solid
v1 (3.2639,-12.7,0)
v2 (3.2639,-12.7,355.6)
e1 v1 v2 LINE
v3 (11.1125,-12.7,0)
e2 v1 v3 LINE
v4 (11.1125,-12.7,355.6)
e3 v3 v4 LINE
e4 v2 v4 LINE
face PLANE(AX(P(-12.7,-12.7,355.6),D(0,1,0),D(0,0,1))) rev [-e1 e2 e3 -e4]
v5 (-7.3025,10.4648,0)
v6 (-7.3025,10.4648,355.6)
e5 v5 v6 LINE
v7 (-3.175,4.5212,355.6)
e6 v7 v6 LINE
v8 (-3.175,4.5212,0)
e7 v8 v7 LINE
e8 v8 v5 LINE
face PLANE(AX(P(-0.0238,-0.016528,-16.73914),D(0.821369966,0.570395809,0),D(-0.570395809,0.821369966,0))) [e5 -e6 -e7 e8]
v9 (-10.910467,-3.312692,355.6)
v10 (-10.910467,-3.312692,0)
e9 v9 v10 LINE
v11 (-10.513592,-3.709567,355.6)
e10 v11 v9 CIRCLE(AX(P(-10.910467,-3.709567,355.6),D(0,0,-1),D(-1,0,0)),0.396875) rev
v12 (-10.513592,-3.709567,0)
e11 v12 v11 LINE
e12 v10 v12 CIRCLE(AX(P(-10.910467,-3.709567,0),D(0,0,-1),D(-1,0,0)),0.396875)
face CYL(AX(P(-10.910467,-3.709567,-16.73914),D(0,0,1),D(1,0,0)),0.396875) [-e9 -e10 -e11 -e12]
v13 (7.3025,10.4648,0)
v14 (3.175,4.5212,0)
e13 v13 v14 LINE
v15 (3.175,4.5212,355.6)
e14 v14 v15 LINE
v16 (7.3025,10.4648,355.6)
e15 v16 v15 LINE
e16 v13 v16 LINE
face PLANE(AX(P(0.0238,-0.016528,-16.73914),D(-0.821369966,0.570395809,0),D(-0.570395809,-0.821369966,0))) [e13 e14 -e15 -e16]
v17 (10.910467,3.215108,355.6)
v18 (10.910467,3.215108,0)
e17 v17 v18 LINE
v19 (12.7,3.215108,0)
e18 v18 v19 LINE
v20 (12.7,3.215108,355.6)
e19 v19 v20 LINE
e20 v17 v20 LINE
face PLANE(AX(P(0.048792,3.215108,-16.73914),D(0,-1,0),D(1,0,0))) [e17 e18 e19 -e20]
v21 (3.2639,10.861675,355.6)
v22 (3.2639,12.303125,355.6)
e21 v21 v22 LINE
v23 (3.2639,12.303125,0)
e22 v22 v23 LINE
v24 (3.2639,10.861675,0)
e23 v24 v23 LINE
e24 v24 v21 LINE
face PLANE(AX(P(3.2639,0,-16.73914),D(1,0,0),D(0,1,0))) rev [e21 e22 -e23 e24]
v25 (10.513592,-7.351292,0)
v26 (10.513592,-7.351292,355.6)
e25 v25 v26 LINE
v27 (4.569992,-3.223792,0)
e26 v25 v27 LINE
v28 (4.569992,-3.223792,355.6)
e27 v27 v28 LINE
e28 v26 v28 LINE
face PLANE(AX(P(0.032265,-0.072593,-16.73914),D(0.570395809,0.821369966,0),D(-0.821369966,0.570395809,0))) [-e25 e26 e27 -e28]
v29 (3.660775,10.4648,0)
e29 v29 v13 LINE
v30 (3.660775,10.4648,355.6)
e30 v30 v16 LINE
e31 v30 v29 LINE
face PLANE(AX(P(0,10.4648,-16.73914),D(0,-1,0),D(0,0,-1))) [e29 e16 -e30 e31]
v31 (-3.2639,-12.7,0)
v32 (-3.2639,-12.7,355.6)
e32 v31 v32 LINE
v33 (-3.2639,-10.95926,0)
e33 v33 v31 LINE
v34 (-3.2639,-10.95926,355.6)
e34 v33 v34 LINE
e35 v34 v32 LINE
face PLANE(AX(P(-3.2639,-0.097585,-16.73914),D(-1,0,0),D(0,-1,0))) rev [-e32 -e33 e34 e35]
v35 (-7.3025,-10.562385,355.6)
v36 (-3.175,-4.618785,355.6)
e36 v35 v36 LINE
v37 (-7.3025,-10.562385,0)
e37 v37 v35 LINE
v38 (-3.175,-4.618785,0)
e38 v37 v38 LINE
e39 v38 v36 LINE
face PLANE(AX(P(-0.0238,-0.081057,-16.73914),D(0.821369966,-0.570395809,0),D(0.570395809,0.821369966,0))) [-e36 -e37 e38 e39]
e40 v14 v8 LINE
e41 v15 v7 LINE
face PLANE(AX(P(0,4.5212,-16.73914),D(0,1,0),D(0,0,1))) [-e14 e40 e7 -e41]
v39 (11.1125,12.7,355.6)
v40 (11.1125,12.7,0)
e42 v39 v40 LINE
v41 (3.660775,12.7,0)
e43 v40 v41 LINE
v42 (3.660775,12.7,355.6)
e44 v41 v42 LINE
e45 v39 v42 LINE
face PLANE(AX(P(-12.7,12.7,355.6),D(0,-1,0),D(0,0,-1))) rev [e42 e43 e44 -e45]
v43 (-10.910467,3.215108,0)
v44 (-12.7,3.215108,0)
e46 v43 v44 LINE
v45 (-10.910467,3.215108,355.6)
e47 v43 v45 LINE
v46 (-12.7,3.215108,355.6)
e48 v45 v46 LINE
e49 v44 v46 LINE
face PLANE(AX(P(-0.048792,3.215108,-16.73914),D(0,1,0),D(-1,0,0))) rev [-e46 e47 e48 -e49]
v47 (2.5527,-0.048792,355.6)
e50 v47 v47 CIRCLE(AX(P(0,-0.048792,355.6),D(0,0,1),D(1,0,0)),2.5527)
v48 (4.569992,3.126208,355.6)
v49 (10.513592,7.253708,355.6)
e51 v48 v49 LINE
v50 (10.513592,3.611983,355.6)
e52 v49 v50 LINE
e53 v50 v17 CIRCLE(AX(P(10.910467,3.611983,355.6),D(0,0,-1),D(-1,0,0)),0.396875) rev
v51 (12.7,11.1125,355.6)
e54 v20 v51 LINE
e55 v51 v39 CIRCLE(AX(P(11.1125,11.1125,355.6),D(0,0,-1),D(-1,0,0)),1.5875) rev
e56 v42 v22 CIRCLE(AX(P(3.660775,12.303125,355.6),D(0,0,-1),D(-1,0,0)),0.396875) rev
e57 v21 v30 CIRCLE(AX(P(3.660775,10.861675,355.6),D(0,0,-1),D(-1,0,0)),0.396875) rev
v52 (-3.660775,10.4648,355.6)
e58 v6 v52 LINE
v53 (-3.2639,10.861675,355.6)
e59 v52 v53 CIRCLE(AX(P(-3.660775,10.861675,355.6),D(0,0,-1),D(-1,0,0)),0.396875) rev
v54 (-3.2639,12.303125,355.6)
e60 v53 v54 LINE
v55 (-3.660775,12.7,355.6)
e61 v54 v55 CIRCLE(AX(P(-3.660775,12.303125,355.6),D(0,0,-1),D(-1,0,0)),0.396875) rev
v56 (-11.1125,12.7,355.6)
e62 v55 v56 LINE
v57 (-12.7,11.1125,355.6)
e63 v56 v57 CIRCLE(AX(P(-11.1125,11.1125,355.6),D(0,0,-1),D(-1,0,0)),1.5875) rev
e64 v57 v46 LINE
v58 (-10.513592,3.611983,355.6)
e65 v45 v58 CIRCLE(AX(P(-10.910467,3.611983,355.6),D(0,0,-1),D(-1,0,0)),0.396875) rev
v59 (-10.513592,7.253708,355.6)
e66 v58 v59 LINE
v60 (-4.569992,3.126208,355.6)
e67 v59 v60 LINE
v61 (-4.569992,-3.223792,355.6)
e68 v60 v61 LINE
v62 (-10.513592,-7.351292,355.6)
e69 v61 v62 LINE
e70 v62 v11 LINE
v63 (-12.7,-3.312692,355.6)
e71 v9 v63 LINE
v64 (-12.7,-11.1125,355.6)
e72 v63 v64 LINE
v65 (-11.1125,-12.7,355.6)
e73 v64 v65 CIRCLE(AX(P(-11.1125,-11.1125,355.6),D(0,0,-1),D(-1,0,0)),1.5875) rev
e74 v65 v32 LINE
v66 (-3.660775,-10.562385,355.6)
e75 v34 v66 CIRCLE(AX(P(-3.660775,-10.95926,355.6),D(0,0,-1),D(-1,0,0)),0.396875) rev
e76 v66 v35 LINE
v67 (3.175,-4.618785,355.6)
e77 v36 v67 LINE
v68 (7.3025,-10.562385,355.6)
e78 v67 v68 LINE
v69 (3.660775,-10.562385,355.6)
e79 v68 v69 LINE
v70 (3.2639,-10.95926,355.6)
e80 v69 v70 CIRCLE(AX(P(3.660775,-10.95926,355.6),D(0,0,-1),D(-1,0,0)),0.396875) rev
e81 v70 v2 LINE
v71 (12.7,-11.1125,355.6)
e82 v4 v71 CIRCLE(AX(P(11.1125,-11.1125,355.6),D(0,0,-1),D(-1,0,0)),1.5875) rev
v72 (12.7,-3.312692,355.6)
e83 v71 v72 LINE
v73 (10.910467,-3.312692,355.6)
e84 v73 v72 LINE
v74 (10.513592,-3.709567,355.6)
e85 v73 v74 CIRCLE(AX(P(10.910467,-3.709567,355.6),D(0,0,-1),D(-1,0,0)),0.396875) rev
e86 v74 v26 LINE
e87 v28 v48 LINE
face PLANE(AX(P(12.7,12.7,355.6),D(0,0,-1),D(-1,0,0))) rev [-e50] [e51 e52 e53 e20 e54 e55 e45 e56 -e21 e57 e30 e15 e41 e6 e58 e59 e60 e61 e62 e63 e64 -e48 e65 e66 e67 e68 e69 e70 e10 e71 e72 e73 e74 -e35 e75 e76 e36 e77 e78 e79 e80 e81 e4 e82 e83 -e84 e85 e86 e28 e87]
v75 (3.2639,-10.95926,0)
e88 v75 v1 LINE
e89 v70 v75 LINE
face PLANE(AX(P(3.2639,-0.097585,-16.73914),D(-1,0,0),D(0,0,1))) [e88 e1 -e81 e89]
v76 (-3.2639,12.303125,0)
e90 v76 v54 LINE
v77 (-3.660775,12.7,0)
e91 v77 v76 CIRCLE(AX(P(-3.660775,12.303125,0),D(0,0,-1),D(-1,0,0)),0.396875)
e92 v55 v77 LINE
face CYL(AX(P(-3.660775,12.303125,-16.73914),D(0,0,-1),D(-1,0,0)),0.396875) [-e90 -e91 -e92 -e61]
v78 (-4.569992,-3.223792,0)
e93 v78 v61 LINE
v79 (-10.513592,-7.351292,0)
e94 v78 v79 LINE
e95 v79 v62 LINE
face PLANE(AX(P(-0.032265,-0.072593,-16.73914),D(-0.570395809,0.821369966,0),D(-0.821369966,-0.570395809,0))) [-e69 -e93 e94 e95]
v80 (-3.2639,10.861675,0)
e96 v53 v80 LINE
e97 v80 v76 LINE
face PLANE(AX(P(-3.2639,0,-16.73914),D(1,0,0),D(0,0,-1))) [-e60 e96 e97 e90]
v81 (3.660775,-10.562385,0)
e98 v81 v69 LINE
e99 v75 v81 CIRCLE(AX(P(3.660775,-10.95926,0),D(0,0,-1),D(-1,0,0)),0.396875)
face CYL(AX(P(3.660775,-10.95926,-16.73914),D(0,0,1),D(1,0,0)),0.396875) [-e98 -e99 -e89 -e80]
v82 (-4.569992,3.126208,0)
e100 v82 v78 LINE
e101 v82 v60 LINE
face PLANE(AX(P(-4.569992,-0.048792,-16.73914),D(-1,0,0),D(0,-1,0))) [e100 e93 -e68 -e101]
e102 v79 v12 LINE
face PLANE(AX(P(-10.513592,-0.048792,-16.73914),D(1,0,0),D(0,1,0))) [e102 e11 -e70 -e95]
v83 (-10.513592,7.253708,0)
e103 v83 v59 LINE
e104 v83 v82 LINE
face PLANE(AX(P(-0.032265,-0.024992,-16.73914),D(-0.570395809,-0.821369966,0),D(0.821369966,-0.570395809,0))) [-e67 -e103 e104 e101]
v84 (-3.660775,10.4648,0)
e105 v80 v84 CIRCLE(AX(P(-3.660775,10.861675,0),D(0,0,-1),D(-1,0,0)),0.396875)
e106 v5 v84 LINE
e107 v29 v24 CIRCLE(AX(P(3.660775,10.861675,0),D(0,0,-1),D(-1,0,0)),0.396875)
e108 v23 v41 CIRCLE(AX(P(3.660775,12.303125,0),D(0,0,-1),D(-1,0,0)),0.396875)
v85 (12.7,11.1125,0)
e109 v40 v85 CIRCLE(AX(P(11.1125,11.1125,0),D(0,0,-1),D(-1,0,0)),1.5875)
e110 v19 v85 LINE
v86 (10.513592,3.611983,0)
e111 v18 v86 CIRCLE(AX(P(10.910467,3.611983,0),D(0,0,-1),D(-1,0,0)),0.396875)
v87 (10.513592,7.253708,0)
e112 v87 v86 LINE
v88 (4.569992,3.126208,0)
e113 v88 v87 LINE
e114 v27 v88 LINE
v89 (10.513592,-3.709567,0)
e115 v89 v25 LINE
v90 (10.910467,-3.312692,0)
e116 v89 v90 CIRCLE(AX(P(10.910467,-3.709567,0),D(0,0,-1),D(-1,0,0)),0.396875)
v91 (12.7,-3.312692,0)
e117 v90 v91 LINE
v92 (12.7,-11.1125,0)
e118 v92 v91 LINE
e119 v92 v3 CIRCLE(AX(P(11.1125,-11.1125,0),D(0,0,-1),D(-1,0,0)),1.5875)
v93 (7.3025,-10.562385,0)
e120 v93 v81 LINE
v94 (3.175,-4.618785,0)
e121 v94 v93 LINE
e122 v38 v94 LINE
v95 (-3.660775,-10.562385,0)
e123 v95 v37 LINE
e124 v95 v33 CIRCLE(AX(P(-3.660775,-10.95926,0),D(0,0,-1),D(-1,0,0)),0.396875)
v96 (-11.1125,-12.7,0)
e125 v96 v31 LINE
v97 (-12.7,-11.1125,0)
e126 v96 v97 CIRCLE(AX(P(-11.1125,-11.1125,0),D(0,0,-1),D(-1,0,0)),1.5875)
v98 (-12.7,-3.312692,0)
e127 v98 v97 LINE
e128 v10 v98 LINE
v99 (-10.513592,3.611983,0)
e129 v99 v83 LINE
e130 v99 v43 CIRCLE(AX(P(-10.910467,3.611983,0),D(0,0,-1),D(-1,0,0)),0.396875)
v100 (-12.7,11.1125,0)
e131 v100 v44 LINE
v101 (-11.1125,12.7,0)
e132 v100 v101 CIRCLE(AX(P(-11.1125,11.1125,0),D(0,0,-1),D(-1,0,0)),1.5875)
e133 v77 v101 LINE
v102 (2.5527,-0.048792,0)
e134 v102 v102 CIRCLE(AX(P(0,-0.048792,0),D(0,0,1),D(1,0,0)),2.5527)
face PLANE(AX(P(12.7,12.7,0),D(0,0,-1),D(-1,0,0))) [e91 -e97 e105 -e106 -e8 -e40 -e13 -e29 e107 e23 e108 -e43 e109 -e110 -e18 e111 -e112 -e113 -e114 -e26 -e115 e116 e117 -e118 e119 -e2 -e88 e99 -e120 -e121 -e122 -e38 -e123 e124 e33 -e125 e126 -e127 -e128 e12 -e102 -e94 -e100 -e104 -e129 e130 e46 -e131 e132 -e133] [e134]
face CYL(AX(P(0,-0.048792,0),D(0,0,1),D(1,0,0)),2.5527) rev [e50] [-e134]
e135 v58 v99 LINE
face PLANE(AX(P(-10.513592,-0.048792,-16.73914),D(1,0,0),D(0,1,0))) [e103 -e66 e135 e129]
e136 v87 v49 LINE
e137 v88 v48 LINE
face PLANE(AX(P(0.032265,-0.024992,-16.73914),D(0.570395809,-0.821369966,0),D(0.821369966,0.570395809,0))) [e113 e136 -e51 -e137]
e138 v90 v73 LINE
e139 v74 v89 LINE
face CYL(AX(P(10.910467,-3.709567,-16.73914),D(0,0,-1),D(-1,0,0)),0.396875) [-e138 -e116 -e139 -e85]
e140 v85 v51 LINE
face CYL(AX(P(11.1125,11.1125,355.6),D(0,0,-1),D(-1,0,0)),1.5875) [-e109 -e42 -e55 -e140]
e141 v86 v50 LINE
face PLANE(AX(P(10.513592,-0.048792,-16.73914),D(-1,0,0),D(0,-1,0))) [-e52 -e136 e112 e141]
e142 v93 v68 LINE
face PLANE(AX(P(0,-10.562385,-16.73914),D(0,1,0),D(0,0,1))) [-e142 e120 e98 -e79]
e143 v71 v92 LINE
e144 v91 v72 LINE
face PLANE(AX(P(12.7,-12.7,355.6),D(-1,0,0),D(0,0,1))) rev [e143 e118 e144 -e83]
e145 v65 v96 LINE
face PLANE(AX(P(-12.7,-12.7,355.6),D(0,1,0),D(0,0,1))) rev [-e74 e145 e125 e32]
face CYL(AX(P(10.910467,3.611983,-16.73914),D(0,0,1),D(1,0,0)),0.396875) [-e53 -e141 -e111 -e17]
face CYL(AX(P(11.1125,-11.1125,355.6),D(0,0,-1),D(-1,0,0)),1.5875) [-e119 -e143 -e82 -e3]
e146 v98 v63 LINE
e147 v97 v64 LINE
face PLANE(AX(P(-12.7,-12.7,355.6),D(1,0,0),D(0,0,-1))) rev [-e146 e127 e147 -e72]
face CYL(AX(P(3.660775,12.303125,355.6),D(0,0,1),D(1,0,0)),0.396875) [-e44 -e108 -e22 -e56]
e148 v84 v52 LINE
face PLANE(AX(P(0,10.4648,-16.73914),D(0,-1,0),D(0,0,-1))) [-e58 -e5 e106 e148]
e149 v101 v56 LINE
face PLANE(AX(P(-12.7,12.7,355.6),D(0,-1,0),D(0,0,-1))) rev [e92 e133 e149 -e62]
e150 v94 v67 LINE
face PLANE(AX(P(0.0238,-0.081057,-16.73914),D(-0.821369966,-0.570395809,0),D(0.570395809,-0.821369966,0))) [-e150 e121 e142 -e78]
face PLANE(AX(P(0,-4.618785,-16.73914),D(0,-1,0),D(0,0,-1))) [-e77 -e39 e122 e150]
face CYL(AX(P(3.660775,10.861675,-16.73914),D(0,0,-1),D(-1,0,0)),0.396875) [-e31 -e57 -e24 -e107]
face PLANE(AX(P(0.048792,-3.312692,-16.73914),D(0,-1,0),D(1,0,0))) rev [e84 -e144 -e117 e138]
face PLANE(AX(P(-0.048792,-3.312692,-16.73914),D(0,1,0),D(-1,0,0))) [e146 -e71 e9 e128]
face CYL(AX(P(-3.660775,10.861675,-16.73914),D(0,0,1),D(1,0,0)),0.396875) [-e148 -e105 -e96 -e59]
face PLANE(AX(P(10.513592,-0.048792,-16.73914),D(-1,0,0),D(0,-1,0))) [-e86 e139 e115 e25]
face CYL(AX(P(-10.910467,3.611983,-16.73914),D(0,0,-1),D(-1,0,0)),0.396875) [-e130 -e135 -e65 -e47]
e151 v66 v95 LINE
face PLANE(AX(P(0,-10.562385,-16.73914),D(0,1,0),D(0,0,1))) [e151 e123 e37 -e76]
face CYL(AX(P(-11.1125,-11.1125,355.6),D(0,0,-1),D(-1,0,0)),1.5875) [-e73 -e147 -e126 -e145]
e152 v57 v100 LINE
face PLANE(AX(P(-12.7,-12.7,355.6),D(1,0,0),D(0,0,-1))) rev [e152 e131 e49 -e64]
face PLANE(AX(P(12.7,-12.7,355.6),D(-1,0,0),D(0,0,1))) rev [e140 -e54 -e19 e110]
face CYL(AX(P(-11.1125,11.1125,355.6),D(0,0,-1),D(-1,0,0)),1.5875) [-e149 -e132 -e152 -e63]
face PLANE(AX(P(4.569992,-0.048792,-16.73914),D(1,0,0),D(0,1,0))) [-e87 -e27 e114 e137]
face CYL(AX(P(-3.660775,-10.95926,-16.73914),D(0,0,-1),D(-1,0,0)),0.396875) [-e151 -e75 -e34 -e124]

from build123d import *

# Parameters (mm, degrees)
SKETCH1_W           = 25.4
SKETCH1_H           = 25.4
BOSS_EXTRUDE1_DEPTH = 355.6
FILLET1_R           = 1.5875
HOLE1_OUTLINE_R     = 2.5527
HOLE1_DEPTH         = 355.6
SKETCH7_W           = 6.5278
SKETCH7_H           = 2.2352
CUT_EXTRUDE2_DEPTH  = 355.6
FILLET4_R           = 0.396875
CIRPATTERN2_DEPTH   = 355.6


# Read off the part's stored shape, not the designer's step: Hole1, CirPattern2
with BuildPart() as part:
    # Sketch1 → Boss-Extrude1 (new body)
    with BuildSketch(Plane.XY):
        Rectangle(SKETCH1_W, SKETCH1_H)
    extrude(amount=BOSS_EXTRUDE1_DEPTH)

    # Fillet1
    fillet1_edges = [part.edges().sort_by_distance(p)[0] for p in [
        (12.7, -12.7, 177.8),
        (-12.7, -12.7, 177.8),
        (-12.7, 12.7, 177.8),
        (12.7, 12.7, 177.8),
    ]]
    fillet(fillet1_edges, radius=FILLET1_R)

    # Hole1 outline → Hole1 (cut)
    with BuildSketch(Plane.XY):
        with Locations((0, -0.048792482)):
            Circle(HOLE1_OUTLINE_R)
    extrude(amount=HOLE1_DEPTH, mode=Mode.SUBTRACT)

    # Sketch7 → Cut-Extrude2 (cut)
    with BuildSketch(Plane.XY.offset(355.6)):
        with Locations((0, 11.5824)):
            Rectangle(SKETCH7_W, SKETCH7_H)
        Polygon((-3.175, 4.5212), (-7.3025, 10.4648), (7.3025, 10.4648), (3.175, 4.5212), align=None)
    extrude(amount=-CUT_EXTRUDE2_DEPTH, mode=Mode.SUBTRACT)

    # Fillet4
    fillet4_edges = [part.edges().sort_by_distance(p)[0] for p in [
        (-3.2639, 10.4648, 177.8),
        (-3.2639, 12.7, 177.8),
        (3.2639, 12.7, 177.8),
        (3.2639, 10.4648, 177.8),
    ]]
    fillet(fillet4_edges, radius=FILLET4_R)

    # CirPattern2 outline → CirPattern2 (cut)
    with BuildSketch(Plane.XY):
        with BuildLine():
            ThreePointArc((-3.660775, -10.562384964), (-3.380141996, -10.67862696), (-3.2639, -10.959259964))
            Line((-3.2639, -10.959259964), (-3.2639, -12.7))
            Line((-3.2639, -12.7), (3.2639, -12.7))
            Line((3.2639, -12.7), (3.2639, -10.959259964))
            ThreePointArc((3.2639, -10.959259964), (3.380141996, -10.67862696), (3.660775, -10.562384964))
            Line((3.660775, -10.562384964), (7.3025, -10.562384964))
            Line((7.3025, -10.562384964), (3.175, -4.618784964))
            Line((3.175, -4.618784964), (-3.175, -4.618784964))
            Line((-3.175, -4.618784964), (-7.3025, -10.562384964))
            Line((-7.3025, -10.562384964), (-3.660775, -10.562384964))
        make_face()
        with BuildLine():
            Line((-12.7, -3.312692482), (-10.910467482, -3.312692482))
            ThreePointArc((-10.910467482, -3.312692482), (-10.629834478, -3.428934478), (-10.513592482, -3.709567482))
            Line((-10.513592482, -3.709567482), (-10.513592482, -7.351292482))
            Line((-10.513592482, -7.351292482), (-4.569992482, -3.223792482))
            Line((-4.569992482, -3.223792482), (-4.569992482, 3.126207518))
            Line((-4.569992482, 3.126207518), (-10.513592482, 7.253707518))
            Line((-10.513592482, 7.253707518), (-10.513592482, 3.611982518))
            ThreePointArc((-10.513592482, 3.611982518), (-10.629834478, 3.331349514), (-10.910467482, 3.215107518))
            Line((-10.910467482, 3.215107518), (-12.7, 3.215107518))
            Line((-12.7, 3.215107518), (-12.7, -3.312692482))
        make_face()
        with BuildLine():
            ThreePointArc((10.513592482, -3.709567482), (10.629834478, -3.428934478), (10.910467482, -3.312692482))
            Line((10.910467482, -3.312692482), (12.7, -3.312692482))
            Line((12.7, -3.312692482), (12.7, 3.215107518))
            Line((12.7, 3.215107518), (10.910467482, 3.215107518))
            ThreePointArc((10.910467482, 3.215107518), (10.629834478, 3.331349514), (10.513592482, 3.611982518))
            Line((10.513592482, 3.611982518), (10.513592482, 7.253707518))
            Line((10.513592482, 7.253707518), (4.569992482, 3.126207518))
            Line((4.569992482, 3.126207518), (4.569992482, -3.223792482))
            Line((4.569992482, -3.223792482), (10.513592482, -7.351292482))
            Line((10.513592482, -7.351292482), (10.513592482, -3.709567482))
        make_face()
    extrude(amount=CIRPATTERN2_DEPTH, mode=Mode.SUBTRACT)


solid = part.part
